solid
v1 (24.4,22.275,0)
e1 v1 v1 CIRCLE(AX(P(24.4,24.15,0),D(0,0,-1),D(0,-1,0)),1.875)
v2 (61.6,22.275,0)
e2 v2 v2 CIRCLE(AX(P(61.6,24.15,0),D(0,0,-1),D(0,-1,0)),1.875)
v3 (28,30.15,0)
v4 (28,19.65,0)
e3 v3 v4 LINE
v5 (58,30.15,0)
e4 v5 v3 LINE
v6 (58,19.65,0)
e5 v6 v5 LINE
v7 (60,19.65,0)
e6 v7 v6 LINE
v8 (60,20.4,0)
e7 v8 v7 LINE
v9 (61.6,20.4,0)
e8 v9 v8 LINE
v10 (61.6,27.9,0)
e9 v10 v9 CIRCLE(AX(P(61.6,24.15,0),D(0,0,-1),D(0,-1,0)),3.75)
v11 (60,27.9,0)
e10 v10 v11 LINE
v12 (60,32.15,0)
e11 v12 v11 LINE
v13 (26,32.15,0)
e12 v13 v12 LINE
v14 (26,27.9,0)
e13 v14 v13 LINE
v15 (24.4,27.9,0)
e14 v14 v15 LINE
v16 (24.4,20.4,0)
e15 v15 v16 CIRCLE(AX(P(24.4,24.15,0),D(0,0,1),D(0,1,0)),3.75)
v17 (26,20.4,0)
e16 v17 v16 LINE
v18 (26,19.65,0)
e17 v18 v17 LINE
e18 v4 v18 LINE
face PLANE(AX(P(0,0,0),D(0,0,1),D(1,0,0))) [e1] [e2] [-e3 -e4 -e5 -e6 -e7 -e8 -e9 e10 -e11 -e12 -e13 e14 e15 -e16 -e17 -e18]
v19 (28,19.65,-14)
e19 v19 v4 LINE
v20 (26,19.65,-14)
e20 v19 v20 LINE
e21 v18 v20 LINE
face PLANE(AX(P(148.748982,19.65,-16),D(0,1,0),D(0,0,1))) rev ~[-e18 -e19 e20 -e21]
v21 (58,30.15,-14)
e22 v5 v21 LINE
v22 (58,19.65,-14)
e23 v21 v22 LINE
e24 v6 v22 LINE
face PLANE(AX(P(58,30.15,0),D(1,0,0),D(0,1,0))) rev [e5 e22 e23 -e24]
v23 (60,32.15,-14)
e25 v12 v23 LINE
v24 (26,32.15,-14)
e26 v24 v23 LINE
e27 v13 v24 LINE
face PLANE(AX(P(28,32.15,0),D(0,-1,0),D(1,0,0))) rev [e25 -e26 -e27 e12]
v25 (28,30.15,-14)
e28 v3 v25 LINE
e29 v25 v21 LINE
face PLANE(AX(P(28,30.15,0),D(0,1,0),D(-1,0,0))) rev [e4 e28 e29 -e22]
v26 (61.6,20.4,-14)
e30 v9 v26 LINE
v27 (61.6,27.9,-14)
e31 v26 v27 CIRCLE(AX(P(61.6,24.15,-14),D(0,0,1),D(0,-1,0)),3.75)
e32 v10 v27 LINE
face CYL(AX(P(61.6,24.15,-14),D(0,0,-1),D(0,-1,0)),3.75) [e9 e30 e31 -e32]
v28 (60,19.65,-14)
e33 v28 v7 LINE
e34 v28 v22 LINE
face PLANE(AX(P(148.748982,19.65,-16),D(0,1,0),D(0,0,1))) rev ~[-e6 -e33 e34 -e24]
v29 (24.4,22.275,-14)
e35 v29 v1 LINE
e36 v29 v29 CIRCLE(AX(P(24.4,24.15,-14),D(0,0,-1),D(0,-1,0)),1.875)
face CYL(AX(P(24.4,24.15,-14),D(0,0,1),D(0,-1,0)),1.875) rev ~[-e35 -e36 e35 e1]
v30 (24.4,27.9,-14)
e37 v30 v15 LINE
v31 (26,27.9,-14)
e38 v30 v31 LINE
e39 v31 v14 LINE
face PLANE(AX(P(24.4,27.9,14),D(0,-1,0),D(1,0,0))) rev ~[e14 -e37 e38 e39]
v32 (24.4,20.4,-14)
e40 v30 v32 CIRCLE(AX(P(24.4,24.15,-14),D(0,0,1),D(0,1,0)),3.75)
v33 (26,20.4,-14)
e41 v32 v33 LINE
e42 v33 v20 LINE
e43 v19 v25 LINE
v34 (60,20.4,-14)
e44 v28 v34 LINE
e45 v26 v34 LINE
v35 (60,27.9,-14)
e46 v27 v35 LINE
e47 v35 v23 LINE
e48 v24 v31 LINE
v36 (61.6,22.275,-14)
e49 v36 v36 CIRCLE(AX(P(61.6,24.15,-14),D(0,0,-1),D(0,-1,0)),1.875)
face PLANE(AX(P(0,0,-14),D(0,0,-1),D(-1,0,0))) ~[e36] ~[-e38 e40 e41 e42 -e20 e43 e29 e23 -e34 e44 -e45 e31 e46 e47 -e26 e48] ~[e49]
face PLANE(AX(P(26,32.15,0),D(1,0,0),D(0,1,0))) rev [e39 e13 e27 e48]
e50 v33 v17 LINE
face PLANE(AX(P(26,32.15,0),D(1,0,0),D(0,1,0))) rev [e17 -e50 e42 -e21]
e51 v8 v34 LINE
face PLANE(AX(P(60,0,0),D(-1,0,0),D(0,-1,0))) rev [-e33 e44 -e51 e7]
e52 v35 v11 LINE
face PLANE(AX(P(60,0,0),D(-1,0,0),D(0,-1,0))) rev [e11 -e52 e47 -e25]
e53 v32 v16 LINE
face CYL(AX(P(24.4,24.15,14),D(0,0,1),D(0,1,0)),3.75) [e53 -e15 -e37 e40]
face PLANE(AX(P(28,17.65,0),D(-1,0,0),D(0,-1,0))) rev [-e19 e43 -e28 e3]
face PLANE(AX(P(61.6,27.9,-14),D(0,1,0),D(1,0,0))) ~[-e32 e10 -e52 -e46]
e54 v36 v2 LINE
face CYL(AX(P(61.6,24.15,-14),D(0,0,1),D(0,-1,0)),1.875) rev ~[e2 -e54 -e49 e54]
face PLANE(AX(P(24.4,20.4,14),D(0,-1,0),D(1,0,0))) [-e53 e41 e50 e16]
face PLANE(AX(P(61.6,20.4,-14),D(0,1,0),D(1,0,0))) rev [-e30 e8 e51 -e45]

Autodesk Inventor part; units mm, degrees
ref_plane "YZ Plane" through (0, 0, 0) normal (1, 0, 0) x (0, 1, 0)
ref_plane "XZ Plane" through (0, 0, 0) normal (0, 1, 0) x (-1, 0, 0)
ref_plane "XY Plane" through (0, 0, 0) normal (0, 0, 1) x (1, 0, 0)
sketch "スケッチ1" plane through (0, 0, 0) normal (0, 0, 1) x (1, 0, 0)
  line L0 (0, 0) -> (0, 17.65)
  line L1 (0, 17.65) -> (28, 17.65)
  line L2 (28, 17.65) -> (28, 30.15)
  line L3 (28, 30.15) -> (58, 30.15)
  line L4 (58, 30.15) -> (58, 0)
  line L5 (58, 0) -> (60, 0)
  line L6 (60, 0) -> (60, 32.15)
  line L7 (60, 32.15) -> (28, 32.15)
  line L8 (28, 32.15) -> (26, 32.15)
  line L9 (26, 32.15) -> (26, 19.65)
  line L10 (26, 19.65) -> (-2, 19.65)
  line L11 (-2, 19.65) -> (-2, 0)
  line L12 (-2, 0) -> (0, 0)
  dimension "d0" = 17.65
  dimension "d1" = 28
  dimension "d2" = 12.5
  dimension "d3" = 30
  dimension "d4" = 2
  dimension "d5" = 32.15
  dimension "d6" = 32
  dimension "d7" = 2
  dimension "d8" = 12.5
  dimension "d9" = 28
extrude "押し出し1" add sketch "スケッチ1" along normal blind 14
sketch "スケッチ2" plane through (60, 0, 0) normal (1, 0, 0) x (0, 0, -1)
  line L0 (0, 0) -> (-14, 0) projected
  line L1 (-14, 0) -> (0, 0)
  line L2 (0, 0) -> (0, 2)
  line L3 (0, 2) -> (-14, 2)
  line L4 (-14, 2) -> (-14, 0)
  dimension "d12" = 14
  dimension "d13" = 2
extrude "押し出し2" add sketch "スケッチ2" along normal blind 7
sketch "スケッチ3" plane through (-2, 0, 0) normal (-1, 0, 0) x (0, 0, 1)
  line L0 (14, 2) -> (0, 2) projected
  line L1 (0, 0) -> (14, 0)
  line L2 (14, 0) -> (14, 2)
  line L3 (14, 2) -> (0, 2)
  line L4 (0, 2) -> (0, 0)
  dimension "d16" = 14
extrude "押し出し3" add sketch "スケッチ3" along normal blind 7
sketch "スケッチ4" plane through (0, 0, 14) normal (0, 0, 1) x (1, 0, 0)
  line L0 (60, 32.15) -> (60, 24.15)
  line L1 (60, 24.15) -> (61.6, 24.15)
  arc A0 (61.6, 20.4) -> (61.6, 27.9) centre (61.6, 24.15) ccw
  line L2 (61.6, 24.15) -> (61.6, 20.4) construction
  line L3 (61.6, 24.15) -> (61.6, 27.9) construction
  line L4 (61.6, 27.9) -> (60, 27.9)
  line L5 (61.6, 20.4) -> (60, 20.4)
  line L6 (60, 2) -> (60, 32.15) projected
  line L7 (60, 27.9) -> (60, 20.4)
  point P0 (0, 0)
  dimension "d47" = 8
  dimension "d48" = 1.6
  dimension "d49" = 3.75
  dimension "d50" = 180
extrude "押し出し4" add sketch "スケッチ4" against normal blind 14
hole "穴3" at (61.6, 24.15, 14) direction (0, 0, -1) diameter 3.75 end through all
sketch "スケッチ7" plane through (0, 0, 14) normal (0, 0, 1) x (1, 0, 0)
  line L0 (60, 32.15) -> (26, 32.15) projected
  line L1 (26, 32.15) -> (26, 24.15)
  line L2 (26, 24.15) -> (24.4, 24.15)
  arc A0 (24.4, 27.9) -> (24.4, 20.4) centre (24.4, 24.15) ccw
  line L3 (24.4, 27.9) -> (26, 27.9)
  line L4 (24.4, 20.4) -> (26, 20.4)
  line L5 (26, 20.4) -> (26, 27.9)
  line L6 (26, 32.15) -> (26, 19.65) projected
  circle A1 centre (24.4, 24.15) radius 1.875
  point P0 (0, 0)
  dimension "d60" = 8
  dimension "d61" = 1.6
  dimension "d62" = 3.75
  dimension "d63" = 3.75
extrude "押し出し6" add sketch "スケッチ7" against normal blind 14 contours L1 A1 L5 L4 A0 L3 | L1 L5 A1 picked at (23.6929, 24.15)
hole "穴4" at (24.4, 24.15, 14) direction (0, 0, -1) diameter 3.75 end through all
sketch "スケッチ10" plane through (0, 17.65, 0) normal (0, -1, 0) x (1, 0, 0)
  line L0 (28, 14) -> (58, 14) projected
  line L1 (0, 0) -> (28, 0)
  line L2 (28, 0) -> (28, 14)
  line L3 (28, 14) -> (0, 14)
  line L4 (0, 14) -> (0, 0)
extrude "押し出し7" cut sketch "スケッチ10" against normal blind 0.6
sketch "スケッチ11" plane through (0, 0, 0) normal (0, -1, 0) x (1, 0, 0)
  line L0 (0, 14) -> (-9, 14) projected
  line L1 (60, 0) -> (67, 0) projected
  line L2 (-9, 14) -> (67, 14)
  line L3 (67, 14) -> (67, 0)
  line L4 (67, 0) -> (-9, 0)
  line L5 (-9, 0) -> (-9, 14)
  point P0 (0, 0)
extrude "押し出し8" cut sketch "スケッチ11" against normal blind 0.6
sketch "スケッチ12" plane through (0, 0, 14) normal (0, 0, 1) x (1, 0, 0)
  line L0 (-2, 19.65) -> (-2, 2) projected
  line L1 (-2, 19.65) -> (4, 19.65)
  line L2 (26, 19.65) -> (-2, 19.65) projected
  line L3 (4, 19.65) -> (4, 18.25)
  line L4 (0, 18.25) -> (28, 18.25) projected
  line L5 (4, 18.25) -> (0.2844, 14.5344)
  line L6 (4, 18.25) -> (9.2547, 18.25) construction
  line L7 (0.2844, 14.5344) -> (0, 14.25)
  line L8 (0, 0.6) -> (0, 18.25) projected
  line L9 (0, 14.25) -> (-2, 14.25)
  line L10 (-2, 14.25) -> (-2, 19.65)
  point P0 (0, 0)
  dimension "d79" = 6
  dimension "d80" = 135
extrude "押し出し9" add sketch "スケッチ12" along normal blind 2
sketch "スケッチ15" plane through (0, 0, 0) normal (0, 0, -1) x (-1, 0, 0)
  line L0 (0, 0.6) -> (0, 18.25) projected
  line L1 (0, 18.25) -> (-14, 18.25)
  line L2 (-14, 18.25) -> (-14, 0.6)
  line L3 (-14, 0.6) -> (0, 0.6)
  line L4 (0, 0.6) -> (0, 18.25)
  point P0 (0, 0)
  dimension "d88" = 14
extrude "押し出し11" add sketch "スケッチ15" against normal blind 1.4
sketch "スケッチ17" plane through (67, 0, 0) normal (1, 0, 0) x (0, 0, -1)
  line L0 (0, 0.6) -> (-14, 0.6) projected
  line L1 (0, 0.6) -> (-14, 0.6)
  line L2 (-14, 0.6) -> (-14, 9.5309)
  line L3 (-14, 9.5309) -> (0, 9.5309)
  line L4 (0, 9.5309) -> (0, 0.6)
  point P0 (0, 0)
extrude "押し出し13" cut sketch "スケッチ17" against normal blind 3
sketch "スケッチ18" plane through (-9, 0, 0) normal (-1, 0, 0) x (0, 0, 1)
  line L0 (0, 0.6) -> (14, 0.6) projected
  line L1 (0, 0.6) -> (14, 0.6)
  line L2 (14, 0.6) -> (14, 6.5)
  line L3 (14, 6.5) -> (0, 6.5)
  line L4 (0, 6.5) -> (0, 0.6)
  point P0 (0, 0)
extrude "押し出し14" cut sketch "スケッチ18" against normal blind 3
hole "穴5" at (-4, 2, 7) direction (0, -1, 0) diameter 2.4 end through all
hole "穴6" at (62, 2, 7) direction (0, -1, 0) diameter 2.4 end through all
mirror "ミラー1" about plane through (31.8158, 20.0509, 0) normal (0, 0, -1) of "押し出し3", "押し出し1", "押し出し4", "穴3", "押し出し2", "穴6", "穴4", "押し出し6", "押し出し7", "押し出し9", "押し出し11", "押し出し14", "押し出し13", "穴5", "押し出し8"
sketch "スケッチ19" plane through (0, 0, 14) normal (0, 0, 1) x (1, 0, 0)
  line L0 (94.8832, 81.412) -> (-62.365, 81.412)
  line L1 (-62.365, 81.412) -> (-62.365, -71.7744)
  line L2 (-62.365, -71.7744) -> (94.8832, -71.7744)
  line L3 (94.8832, -71.7744) -> (94.8832, 81.412)
  point P0 (0, 0)
extrude "押し出し15" cut sketch "スケッチ19" against normal blind 14
sketch "スケッチ20" plane through (-2, 19.65, 14) normal (0, 1, 0) x (1, 0, 0)
  line L0 (17.6833, -4.2941) -> (-12.6138, -4.2941)
  line L1 (-12.6138, -4.2941) -> (-12.6138, 1.0873)
  line L2 (-12.6138, 1.0873) -> (17.6833, 1.0873)
  line L3 (17.6833, 1.0873) -> (17.6833, -4.2941)
  point P0 (2, 14)
extrude "押し出し16" cut sketch "スケッチ20" against normal blind 14
sketch "スケッチ21" plane through (26, 27.9, -14) normal (-1, 0, 0) x (0, 0, 1)
  line L0 (0, -8.25) -> (-2, -8.25) projected
  line L1 (-2, -8.25) -> (18.9234, -8.25)
  line L2 (18.9234, -8.25) -> (18.9234, 5.2405)
  line L3 (18.9234, 5.2405) -> (-2, 5.2405)
  line L4 (-2, 5.2405) -> (-2, -8.25)
  point P0 (14, -27.9)
split body "分割1" sketch "スケッチ21" result one side removed curves L2 L3 L4 L1 removed pieces at (9.3333, 19.15, -4.6667) (58.5, 13.3, -4.6667)
properties part number "センサ冶具小"
